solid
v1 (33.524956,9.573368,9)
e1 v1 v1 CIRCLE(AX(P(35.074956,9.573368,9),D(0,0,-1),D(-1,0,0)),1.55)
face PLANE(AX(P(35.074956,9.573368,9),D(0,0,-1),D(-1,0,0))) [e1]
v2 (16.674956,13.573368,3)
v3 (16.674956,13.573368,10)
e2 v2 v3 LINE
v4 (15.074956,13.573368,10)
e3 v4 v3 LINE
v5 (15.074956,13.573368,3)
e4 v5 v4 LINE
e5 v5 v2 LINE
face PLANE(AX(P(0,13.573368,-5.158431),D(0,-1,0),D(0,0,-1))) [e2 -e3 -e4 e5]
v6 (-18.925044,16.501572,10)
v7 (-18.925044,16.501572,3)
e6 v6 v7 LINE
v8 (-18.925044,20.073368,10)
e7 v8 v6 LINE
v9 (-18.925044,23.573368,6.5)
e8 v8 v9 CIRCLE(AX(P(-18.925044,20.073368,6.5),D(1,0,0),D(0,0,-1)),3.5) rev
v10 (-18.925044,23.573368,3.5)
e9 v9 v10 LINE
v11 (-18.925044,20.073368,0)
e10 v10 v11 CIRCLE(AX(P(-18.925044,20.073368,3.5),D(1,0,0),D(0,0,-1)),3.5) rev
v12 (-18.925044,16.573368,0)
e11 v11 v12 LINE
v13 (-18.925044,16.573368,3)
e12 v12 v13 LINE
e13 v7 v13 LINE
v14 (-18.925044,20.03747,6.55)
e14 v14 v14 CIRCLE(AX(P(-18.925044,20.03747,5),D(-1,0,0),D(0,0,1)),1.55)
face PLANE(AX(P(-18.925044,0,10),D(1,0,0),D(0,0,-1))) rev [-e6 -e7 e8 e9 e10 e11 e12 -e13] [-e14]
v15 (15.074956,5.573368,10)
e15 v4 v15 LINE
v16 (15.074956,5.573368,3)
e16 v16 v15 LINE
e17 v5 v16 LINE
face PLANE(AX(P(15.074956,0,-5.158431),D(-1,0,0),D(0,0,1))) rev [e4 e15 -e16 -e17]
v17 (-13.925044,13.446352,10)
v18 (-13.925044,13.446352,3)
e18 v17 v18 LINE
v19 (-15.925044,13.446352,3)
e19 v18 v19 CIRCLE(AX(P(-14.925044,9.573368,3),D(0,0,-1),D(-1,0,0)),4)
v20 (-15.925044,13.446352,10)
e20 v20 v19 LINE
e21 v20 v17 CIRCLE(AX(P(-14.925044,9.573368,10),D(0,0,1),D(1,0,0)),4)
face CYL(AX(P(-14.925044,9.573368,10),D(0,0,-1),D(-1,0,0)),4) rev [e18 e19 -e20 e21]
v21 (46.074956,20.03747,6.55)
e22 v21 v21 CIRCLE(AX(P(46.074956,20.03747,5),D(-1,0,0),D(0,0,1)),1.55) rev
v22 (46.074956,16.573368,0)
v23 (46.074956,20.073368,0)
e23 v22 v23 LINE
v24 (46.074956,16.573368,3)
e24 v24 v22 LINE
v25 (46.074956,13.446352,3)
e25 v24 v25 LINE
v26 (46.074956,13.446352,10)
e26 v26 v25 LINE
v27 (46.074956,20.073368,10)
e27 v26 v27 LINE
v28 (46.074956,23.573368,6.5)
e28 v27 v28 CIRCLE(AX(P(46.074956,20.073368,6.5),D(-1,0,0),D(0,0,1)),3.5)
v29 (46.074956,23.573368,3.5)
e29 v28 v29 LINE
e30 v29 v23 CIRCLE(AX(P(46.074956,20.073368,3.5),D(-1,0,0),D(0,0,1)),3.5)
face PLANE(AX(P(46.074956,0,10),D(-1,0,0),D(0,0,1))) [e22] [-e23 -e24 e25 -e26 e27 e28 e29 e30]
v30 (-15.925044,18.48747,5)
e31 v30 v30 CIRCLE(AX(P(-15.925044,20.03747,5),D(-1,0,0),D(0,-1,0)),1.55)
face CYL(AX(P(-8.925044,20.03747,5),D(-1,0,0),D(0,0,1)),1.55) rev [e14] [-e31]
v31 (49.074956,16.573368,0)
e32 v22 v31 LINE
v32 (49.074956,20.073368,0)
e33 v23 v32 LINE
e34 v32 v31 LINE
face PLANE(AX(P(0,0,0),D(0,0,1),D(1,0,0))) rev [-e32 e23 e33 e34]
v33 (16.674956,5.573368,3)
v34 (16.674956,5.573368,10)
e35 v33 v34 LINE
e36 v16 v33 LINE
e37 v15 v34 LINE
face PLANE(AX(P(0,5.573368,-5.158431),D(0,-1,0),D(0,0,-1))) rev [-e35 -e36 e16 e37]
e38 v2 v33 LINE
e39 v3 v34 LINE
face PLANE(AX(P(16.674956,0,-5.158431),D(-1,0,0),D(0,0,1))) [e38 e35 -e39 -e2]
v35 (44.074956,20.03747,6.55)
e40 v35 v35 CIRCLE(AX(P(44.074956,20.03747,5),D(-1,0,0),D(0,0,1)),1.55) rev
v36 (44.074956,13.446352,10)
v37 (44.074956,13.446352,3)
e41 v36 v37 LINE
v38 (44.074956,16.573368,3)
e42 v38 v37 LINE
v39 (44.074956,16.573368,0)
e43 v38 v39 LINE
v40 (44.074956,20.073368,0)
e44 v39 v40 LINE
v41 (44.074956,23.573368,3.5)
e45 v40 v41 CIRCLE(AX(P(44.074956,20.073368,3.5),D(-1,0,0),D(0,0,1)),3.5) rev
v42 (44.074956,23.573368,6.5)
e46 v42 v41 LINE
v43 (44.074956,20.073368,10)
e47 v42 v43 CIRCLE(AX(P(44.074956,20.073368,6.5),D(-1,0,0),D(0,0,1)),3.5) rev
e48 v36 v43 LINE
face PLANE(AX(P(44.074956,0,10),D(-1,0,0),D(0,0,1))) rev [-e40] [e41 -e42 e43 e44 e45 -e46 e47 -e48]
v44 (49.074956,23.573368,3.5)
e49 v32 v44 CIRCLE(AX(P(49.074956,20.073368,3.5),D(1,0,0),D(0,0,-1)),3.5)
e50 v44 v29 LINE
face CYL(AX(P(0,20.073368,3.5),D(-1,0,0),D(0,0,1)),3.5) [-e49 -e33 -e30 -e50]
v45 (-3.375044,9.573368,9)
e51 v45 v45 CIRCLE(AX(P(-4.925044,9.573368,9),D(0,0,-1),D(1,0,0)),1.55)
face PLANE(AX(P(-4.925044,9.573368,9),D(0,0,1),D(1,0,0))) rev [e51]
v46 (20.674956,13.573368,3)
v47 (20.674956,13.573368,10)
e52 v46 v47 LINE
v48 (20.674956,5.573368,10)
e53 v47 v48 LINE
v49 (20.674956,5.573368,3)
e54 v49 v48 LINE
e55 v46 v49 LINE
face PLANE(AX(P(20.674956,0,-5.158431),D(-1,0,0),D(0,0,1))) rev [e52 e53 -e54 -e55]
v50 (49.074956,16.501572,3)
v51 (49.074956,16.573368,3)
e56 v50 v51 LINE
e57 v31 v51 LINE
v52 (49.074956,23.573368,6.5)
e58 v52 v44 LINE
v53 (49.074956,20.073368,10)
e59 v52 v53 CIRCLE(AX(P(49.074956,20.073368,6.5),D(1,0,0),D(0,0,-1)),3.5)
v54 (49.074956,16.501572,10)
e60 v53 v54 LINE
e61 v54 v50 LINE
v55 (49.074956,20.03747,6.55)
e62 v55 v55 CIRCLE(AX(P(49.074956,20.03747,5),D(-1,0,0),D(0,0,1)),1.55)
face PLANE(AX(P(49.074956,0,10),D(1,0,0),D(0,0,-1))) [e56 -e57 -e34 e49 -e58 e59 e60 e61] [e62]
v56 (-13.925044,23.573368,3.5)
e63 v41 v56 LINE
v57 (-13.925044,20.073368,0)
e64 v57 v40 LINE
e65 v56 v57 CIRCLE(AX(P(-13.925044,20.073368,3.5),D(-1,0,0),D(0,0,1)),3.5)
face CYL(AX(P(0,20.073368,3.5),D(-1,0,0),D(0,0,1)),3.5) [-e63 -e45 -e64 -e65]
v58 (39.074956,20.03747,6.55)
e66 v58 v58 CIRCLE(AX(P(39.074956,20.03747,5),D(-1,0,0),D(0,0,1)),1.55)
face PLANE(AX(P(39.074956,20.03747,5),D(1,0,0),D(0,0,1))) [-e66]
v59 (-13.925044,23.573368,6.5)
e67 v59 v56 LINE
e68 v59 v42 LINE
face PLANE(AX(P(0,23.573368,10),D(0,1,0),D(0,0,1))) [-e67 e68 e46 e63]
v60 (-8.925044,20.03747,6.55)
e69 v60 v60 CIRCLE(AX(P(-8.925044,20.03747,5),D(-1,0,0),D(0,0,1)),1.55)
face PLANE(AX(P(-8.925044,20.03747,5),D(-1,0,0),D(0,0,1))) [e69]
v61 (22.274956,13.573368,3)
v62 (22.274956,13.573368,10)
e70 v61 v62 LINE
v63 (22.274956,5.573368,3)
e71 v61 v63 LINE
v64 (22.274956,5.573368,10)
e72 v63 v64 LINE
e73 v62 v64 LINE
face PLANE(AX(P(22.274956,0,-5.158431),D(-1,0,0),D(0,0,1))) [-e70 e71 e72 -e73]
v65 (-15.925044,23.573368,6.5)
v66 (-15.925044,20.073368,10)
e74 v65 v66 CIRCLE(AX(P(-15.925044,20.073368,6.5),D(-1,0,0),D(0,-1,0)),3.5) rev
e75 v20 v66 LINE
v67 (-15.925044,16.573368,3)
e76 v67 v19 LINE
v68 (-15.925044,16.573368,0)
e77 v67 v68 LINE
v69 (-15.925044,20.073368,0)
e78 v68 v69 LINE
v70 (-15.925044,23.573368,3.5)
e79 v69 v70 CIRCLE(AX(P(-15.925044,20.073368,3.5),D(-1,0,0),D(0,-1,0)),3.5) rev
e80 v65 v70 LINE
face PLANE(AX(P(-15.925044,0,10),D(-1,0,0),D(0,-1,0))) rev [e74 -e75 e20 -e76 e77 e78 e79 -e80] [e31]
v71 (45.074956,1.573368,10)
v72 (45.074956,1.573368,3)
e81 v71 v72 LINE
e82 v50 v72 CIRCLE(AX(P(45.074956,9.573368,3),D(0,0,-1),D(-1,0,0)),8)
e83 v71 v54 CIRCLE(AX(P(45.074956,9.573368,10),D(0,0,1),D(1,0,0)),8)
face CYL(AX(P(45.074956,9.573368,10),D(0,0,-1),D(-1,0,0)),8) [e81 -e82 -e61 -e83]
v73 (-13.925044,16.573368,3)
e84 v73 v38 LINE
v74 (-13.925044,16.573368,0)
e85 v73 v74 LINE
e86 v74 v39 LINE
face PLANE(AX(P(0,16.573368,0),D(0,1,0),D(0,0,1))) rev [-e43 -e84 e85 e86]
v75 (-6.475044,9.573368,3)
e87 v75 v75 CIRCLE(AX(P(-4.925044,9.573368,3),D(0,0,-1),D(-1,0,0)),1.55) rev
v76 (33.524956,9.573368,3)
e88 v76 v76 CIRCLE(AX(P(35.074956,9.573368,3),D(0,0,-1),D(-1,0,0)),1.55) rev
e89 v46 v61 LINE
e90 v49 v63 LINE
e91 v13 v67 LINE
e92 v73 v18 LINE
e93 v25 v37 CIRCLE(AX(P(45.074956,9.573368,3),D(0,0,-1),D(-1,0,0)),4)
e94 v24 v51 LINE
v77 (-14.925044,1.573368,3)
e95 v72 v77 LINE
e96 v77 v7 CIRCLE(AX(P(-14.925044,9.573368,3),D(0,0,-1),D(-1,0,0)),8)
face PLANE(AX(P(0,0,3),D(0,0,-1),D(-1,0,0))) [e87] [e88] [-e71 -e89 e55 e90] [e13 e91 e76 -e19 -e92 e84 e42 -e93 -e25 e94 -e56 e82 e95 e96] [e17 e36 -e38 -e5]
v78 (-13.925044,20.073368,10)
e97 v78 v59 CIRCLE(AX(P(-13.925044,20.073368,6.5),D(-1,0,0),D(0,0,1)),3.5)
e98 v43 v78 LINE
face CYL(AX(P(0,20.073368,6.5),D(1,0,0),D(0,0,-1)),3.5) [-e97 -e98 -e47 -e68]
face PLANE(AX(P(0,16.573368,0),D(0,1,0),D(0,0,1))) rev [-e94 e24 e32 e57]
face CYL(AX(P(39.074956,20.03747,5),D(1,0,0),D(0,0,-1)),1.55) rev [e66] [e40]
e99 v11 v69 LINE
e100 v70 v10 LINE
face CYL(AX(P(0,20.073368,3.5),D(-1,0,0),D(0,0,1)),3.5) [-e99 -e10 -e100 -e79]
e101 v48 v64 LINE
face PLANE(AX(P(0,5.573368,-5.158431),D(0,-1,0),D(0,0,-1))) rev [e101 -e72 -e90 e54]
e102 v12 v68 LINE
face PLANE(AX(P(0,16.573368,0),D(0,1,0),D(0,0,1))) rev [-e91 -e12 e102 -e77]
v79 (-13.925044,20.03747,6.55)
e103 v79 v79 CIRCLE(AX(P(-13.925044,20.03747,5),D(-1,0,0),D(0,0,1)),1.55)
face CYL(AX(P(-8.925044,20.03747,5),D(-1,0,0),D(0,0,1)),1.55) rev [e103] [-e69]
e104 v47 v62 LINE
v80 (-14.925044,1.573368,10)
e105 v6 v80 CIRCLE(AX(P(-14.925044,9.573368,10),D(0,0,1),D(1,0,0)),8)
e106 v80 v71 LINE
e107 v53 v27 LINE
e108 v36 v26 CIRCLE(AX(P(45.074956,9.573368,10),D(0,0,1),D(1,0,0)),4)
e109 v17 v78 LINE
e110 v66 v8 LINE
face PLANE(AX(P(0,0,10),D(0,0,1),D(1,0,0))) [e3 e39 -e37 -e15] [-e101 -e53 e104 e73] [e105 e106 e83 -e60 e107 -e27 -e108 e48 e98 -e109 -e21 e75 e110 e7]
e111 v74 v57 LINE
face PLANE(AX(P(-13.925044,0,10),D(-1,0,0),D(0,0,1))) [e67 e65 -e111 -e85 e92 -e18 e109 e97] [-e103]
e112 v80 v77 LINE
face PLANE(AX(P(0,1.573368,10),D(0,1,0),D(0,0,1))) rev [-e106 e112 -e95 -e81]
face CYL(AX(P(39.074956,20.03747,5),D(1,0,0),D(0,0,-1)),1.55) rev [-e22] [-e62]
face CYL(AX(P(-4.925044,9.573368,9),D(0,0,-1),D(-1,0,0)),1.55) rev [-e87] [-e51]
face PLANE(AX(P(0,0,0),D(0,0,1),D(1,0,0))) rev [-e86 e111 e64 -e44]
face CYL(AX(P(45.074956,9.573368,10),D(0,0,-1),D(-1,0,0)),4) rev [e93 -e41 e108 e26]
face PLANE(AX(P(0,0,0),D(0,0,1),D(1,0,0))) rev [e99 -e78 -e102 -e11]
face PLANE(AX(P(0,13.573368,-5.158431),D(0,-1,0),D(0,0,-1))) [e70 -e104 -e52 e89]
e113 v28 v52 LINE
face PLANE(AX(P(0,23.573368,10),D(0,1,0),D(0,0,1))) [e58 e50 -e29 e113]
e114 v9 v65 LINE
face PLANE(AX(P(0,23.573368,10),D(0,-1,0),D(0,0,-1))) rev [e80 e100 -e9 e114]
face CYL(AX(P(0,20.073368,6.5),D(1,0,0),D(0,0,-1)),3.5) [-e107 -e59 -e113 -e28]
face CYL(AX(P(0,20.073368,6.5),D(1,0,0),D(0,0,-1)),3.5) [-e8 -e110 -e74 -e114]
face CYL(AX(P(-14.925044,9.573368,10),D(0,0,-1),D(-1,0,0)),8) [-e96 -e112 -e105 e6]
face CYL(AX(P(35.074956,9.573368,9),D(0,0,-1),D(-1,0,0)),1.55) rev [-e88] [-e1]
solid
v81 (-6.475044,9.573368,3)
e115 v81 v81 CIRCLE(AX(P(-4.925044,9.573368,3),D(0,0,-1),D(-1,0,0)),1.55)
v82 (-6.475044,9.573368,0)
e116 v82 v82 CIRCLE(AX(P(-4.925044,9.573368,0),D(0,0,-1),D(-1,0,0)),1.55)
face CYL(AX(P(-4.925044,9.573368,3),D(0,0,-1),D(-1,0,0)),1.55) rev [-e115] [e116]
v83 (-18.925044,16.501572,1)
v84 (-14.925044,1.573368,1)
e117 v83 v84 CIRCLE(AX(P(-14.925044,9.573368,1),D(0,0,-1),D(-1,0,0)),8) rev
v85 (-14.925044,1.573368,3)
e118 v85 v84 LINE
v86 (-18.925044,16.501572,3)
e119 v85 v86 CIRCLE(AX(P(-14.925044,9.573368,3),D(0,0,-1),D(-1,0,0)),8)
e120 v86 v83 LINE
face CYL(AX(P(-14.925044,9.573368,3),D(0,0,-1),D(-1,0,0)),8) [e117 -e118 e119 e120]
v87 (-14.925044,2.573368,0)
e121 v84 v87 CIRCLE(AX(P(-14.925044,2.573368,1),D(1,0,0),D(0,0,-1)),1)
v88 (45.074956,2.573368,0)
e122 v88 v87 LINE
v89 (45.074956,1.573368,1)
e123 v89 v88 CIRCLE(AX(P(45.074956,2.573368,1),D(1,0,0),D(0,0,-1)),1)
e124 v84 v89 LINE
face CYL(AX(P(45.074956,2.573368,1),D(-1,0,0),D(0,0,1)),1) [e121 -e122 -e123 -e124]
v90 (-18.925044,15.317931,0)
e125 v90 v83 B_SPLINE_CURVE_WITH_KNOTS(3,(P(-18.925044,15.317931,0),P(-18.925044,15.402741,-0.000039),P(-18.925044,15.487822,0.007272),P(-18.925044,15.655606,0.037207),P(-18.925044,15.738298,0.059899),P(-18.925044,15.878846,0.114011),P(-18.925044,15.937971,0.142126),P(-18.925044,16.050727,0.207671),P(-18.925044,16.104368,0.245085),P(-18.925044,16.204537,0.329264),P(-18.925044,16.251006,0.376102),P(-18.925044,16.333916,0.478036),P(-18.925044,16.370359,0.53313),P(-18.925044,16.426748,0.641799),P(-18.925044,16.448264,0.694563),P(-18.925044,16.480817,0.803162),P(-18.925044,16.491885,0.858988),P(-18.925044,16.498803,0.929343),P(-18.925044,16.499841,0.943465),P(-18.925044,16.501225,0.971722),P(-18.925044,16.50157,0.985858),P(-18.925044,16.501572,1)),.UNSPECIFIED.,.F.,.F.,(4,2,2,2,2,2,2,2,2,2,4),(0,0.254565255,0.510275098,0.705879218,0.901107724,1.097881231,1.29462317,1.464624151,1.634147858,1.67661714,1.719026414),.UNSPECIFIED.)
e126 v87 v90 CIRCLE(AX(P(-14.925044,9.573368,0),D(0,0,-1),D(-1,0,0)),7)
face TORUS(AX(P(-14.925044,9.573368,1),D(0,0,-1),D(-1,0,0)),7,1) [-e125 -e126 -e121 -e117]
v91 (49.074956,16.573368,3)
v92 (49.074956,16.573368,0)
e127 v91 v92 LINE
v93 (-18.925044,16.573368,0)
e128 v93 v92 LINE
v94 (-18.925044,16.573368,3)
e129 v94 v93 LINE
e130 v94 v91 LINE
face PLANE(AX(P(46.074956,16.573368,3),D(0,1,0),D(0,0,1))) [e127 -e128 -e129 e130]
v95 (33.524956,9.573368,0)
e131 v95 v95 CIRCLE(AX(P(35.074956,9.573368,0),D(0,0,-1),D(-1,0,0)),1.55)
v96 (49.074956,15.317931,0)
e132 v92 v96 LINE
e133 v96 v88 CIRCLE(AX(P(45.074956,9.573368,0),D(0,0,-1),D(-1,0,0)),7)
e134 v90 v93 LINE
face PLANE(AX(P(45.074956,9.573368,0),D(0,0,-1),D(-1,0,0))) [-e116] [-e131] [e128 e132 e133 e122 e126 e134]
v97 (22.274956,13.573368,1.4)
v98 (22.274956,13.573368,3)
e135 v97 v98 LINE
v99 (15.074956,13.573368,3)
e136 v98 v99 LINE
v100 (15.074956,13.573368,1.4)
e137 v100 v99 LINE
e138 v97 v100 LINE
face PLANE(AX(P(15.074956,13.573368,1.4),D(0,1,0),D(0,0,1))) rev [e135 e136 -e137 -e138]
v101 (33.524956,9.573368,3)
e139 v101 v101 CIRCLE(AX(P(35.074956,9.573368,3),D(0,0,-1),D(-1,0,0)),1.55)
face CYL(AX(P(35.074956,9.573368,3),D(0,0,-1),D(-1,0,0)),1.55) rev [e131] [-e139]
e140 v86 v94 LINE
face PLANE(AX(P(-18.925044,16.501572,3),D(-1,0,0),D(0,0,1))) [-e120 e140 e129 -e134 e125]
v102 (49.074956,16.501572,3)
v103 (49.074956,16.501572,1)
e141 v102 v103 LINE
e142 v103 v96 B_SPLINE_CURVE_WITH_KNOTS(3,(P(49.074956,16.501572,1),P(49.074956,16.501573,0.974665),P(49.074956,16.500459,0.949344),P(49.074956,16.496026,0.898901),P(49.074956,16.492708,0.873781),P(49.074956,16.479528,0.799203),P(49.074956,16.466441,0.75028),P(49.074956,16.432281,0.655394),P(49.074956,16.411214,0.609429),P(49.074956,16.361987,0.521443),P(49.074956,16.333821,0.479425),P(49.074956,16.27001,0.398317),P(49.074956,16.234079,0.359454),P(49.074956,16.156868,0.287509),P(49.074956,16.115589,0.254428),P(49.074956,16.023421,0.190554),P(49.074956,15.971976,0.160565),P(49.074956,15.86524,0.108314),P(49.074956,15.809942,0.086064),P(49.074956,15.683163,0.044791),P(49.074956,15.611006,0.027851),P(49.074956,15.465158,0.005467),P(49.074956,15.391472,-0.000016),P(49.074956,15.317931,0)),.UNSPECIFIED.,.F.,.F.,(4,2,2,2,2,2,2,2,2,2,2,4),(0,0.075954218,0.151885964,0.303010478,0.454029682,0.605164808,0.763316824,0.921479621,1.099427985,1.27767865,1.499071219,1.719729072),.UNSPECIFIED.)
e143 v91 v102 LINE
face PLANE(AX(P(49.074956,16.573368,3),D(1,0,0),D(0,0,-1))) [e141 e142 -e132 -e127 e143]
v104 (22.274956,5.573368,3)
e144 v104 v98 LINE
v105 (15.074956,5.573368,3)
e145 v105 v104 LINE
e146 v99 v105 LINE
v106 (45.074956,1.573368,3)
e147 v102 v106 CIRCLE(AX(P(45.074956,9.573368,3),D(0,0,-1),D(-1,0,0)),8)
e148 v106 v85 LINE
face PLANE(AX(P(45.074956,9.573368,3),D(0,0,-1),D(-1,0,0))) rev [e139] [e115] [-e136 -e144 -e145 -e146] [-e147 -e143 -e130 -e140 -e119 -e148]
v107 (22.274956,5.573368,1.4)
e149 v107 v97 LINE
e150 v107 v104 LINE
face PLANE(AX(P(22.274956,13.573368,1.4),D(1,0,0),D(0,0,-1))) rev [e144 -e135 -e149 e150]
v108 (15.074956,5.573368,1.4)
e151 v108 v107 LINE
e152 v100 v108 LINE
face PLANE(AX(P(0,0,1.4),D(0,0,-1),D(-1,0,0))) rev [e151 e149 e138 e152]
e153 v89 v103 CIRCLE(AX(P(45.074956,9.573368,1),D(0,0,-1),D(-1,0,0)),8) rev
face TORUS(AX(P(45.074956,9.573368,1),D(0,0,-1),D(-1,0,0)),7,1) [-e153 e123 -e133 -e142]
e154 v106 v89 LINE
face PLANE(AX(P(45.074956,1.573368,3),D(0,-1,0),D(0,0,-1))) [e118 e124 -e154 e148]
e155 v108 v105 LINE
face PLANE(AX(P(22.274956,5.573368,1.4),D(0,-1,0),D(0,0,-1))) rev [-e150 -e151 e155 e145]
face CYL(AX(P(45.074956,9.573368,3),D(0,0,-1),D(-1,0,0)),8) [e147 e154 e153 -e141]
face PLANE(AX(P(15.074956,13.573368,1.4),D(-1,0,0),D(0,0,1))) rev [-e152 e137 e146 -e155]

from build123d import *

# Parameters (mm, degrees)
BOSS_EXTRUDE1_DEPTH = 10
SKETCH2_R           = 1.55
CUT_EXTRUDE1_DEPTH  = 10
FILLET1_R           = 3.5
BOSS_EXTRUDE2_DEPTH = 3
SKETCH4_R           = 1.55
CUT_EXTRUDE2_DEPTH  = 9
SPLIT2_START        = 16.573368434
SPLIT2_OUTLINE_W    = 3
SPLIT2_OUTLINE_H    = 3
SPLIT2_OUTLINE_W_2  = 58
SPLIT2_DEPTH        = 8.426631566
SPLIT2_START_2      = -18.925043944
SPLIT2_2_DEPTH      = 3
SPLIT2_START_3      = -13.925043944
SPLIT2_3_DEPTH      = 58
SPLIT2_START_4      = 46.074956056
SPLIT2_4_DEPTH      = 3
SKETCH5_R           = 1.55
BOSS_EXTRUDE3_DEPTH = 3
SKETCH6_W           = 1.6
SKETCH6_H           = 8
CUT_EXTRUDE3_DEPTH  = 7
SKETCH7_W           = 7.2
SKETCH7_H           = 8
CUT_EXTRUDE4_DEPTH  = 1.6
FILLET2_R           = 1


with BuildPart() as part:
    # Sketch1 → Boss-Extrude1 (new body)
    with BuildSketch(Plane.XY):
        with BuildLine():
            Line((-14.925043944, 1.573368434), (45.074956056, 1.573368434))
            ThreePointArc((45.074956056, 1.573368434), (52.802362666, 7.502816073), (49.074956056, 16.501571665))
            Line((49.074956056, 16.501571665), (49.074956056, 23.573368434))
            Line((49.074956056, 23.573368434), (46.074956056, 23.573368434))
            Line((46.074956056, 23.573368434), (46.074956056, 13.44635178))
            ThreePointArc((46.074956056, 13.44635178), (45.074956056, 5.573368434), (44.074956056, 13.44635178))
            Line((44.074956056, 13.44635178), (44.074956056, 23.573368434))
            Line((44.074956056, 23.573368434), (-13.925043944, 23.573368434))
            Line((-13.925043944, 23.573368434), (-13.925043944, 13.44635178))
            ThreePointArc((-13.925043944, 13.44635178), (-14.925043944, 5.573368434), (-15.925043944, 13.44635178))
            Line((-15.925043944, 13.44635178), (-15.925043944, 23.573368434))
            Line((-15.925043944, 23.573368434), (-18.925043944, 23.573368434))
            Line((-18.925043944, 23.573368434), (-18.925043944, 16.501571665))
            ThreePointArc((-18.925043944, 16.501571665), (-22.652450555, 7.502816073), (-14.925043944, 1.573368434))
        make_face()
    extrude(amount=BOSS_EXTRUDE1_DEPTH)

    # Sketch2 → Cut-Extrude1 (cut)
    with BuildSketch(Plane.ZY.offset(18.925043944)):
        with Locations((5, 20.037470049)):
            Circle(SKETCH2_R)
    cut_extrude1 = extrude(amount=-CUT_EXTRUDE1_DEPTH, mode=Mode.SUBTRACT)

    # Fillet1
    fillet1_edges = [part.edges().sort_by_distance(p)[0] for p in [
        (-17.425043944, 23.573368434, 0),
        (15.074956056, 23.573368434, 0),
        (47.574956056, 23.573368434, 0),
        (47.574956056, 23.573368434, 10),
        (15.074956056, 23.573368434, 10),
        (-17.425043944, 23.573368434, 10),
    ]]
    fillet(fillet1_edges, radius=FILLET1_R)

    # Mirror1: Cut-Extrude1 across plane
    add(cut_extrude1.mirror(Plane.ZY.offset(-15.074956056)), mode=Mode.SUBTRACT)

    # Sketch4 → Cut-Extrude2 (cut)
    with BuildSketch(Plane(origin=(0, 0, 0), x_dir=(-1, 0, 0), z_dir=(0, 0, -1))):
        with Locations((-35.074956056, 9.573368434)):
            Circle(SKETCH4_R)
        with Locations(Location((4.925043944, 9.573368434, 0), (0, 0, 180))):
            Circle(SKETCH4_R)
    extrude(amount=-CUT_EXTRUDE2_DEPTH, mode=Mode.SUBTRACT)


with BuildPart() as body_2:
    # Sketch3 → Boss-Extrude2 (new body)
    with BuildSketch(Plane(origin=(0, 0, 0), x_dir=(-1, 0, 0), z_dir=(0, 0, -1))):
        with BuildLine():
            Line((-45.074956056, 17.573368434), (14.925043944, 17.573368434))
            ThreePointArc((14.925043944, 17.573368434), (22.925043944, 9.573368434), (14.925043944, 1.573368434))
            Line((14.925043944, 1.573368434), (-45.074956056, 1.573368434))
            ThreePointArc((-45.074956056, 1.573368434), (-53.074956056, 9.573368434), (-45.074956056, 17.573368434))
        make_face()
    extrude(amount=BOSS_EXTRUDE2_DEPTH)


with BuildPart() as body_3:
    # Split1: the piece on the far side of the plane
    add(part.part)
    split(bisect_by=Plane(origin=(0, 0, 3), x_dir=(-1, 0, 0), z_dir=(0, 0, -1)), keep=Keep.BOTTOM)


with BuildPart() as part_1:
    add(part.part)

    # Split1
    split(bisect_by=Plane(origin=(0, 0, 3), x_dir=(-1, 0, 0), z_dir=(0, 0, -1)), keep=Keep.TOP)

    # Split2: read off the stored shape, not the designer's step
    # Split2 outline → Split2 (cut)
    with BuildSketch(Plane(origin=(0, 0, 0), x_dir=(1, 0, 0), z_dir=(0, 1, 0)).offset(SPLIT2_START)):
        with Locations((47.574956056, -1.5)):
            Rectangle(SPLIT2_OUTLINE_W, SPLIT2_OUTLINE_H)
        with Locations((15.074956056, -1.5)):
            Rectangle(SPLIT2_OUTLINE_W_2, SPLIT2_OUTLINE_H)
        with Locations((-17.425043944, -1.5)):
            Rectangle(SPLIT2_OUTLINE_W, SPLIT2_OUTLINE_H)
    extrude(amount=SPLIT2_DEPTH, mode=Mode.SUBTRACT)


with BuildPart() as body_4:
    # Split2 2 outline → Split2 2 (new body)
    with BuildSketch(Plane.YZ.offset(SPLIT2_START_2)):
        with BuildLine():
            Line((16.573368434, 3), (16.573368434, 0))
            Line((16.573368434, 0), (20.073368434, 0))
            ThreePointArc((20.073368434, 0), (22.364656282, 0.854248689), (23.537470049, 3))
            Line((23.537470049, 3), (16.573368434, 3))
        make_face()
    extrude(amount=SPLIT2_2_DEPTH)


with BuildPart() as body_5:
    # Split2 3 outline → Split2 3 (new body)
    with BuildSketch(Plane.YZ.offset(SPLIT2_START_3)):
        with BuildLine():
            Line((16.573368434, 3), (16.573368434, 0))
            Line((16.573368434, 0), (20.073368434, 0))
            ThreePointArc((20.073368434, 0), (22.364656282, 0.854248689), (23.537470049, 3))
            Line((23.537470049, 3), (16.573368434, 3))
        make_face()
    extrude(amount=SPLIT2_3_DEPTH)


with BuildPart() as body_6:
    # Split2 4 outline → Split2 4 (new body)
    with BuildSketch(Plane.YZ.offset(SPLIT2_START_4)):
        with BuildLine():
            Line((16.573368434, 3), (16.573368434, 0))
            Line((16.573368434, 0), (20.073368434, 0))
            ThreePointArc((20.073368434, 0), (22.364656282, 0.854248689), (23.537470049, 3))
            Line((23.537470049, 3), (16.573368434, 3))
        make_face()
    extrude(amount=SPLIT2_4_DEPTH)

    # Combine1: union body 5, body 4, body 3
    add(body_5.part)
    add(body_4.part)
    add(body_3.part)

    # Sketch6 → Cut-Extrude3 (cut)
    with BuildSketch(Plane.XY.offset(10)):
        with Locations((15.874956056, 9.573368434)):
            Rectangle(SKETCH6_W, SKETCH6_H)
        with Locations((21.474956056, 9.573368434)):
            Rectangle(SKETCH6_W, SKETCH6_H)
    extrude(amount=-CUT_EXTRUDE3_DEPTH, mode=Mode.SUBTRACT)


with BuildPart() as body_4_2:
    # Sketch5 → Boss-Extrude3 (new body)
    with BuildSketch(Plane(origin=(0, 0, 0), x_dir=(-1, 0, 0), z_dir=(0, 0, -1))):
        with BuildLine():
            Line((-46.074956056, 16.573368434), (-44.074956056, 16.573368434))
            Line((-44.074956056, 16.573368434), (13.925043944, 16.573368434))
            Line((13.925043944, 16.573368434), (15.925043944, 16.573368434))
            Line((15.925043944, 16.573368434), (18.925043944, 16.573368434))
            Line((18.925043944, 16.573368434), (18.925043944, 16.501571665))
            ThreePointArc((18.925043944, 16.501571665), (22.652450555, 7.502816073), (14.925043944, 1.573368434))
            Line((14.925043944, 1.573368434), (-45.074956056, 1.573368434))
            ThreePointArc((-45.074956056, 1.573368434), (-52.802362666, 7.502816073), (-49.074956056, 16.501571665))
            Line((-49.074956056, 16.501571665), (-49.074956056, 16.573368434))
            Line((-49.074956056, 16.573368434), (-46.074956056, 16.573368434))
        make_face()
        with Locations((4.925043944, 9.573368434)):
            Circle(SKETCH5_R, mode=Mode.SUBTRACT)
        with Locations((-35.074956056, 9.573368434)):
            Circle(SKETCH5_R, mode=Mode.SUBTRACT)
    extrude(amount=-BOSS_EXTRUDE3_DEPTH)

    # Sketch7 → Cut-Extrude4 (cut)
    with BuildSketch(Plane.XY.offset(3)):
        with Locations((18.674956056, 9.573368434)):
            Rectangle(SKETCH7_W, SKETCH7_H)
    extrude(amount=-CUT_EXTRUDE4_DEPTH, mode=Mode.SUBTRACT)

    # Fillet2
    fillet2_edges = [body_4_2.edges().sort_by_distance(p)[0] for p in [
        (-22.652450555, 7.502816073, 0),
        (15.074956056, 1.573368434, 0),
        (52.802362666, 7.502816073, 0),
    ]]
    fillet(fillet2_edges, radius=FILLET2_R)


solid = Compound([body_6.part, body_4_2.part])
